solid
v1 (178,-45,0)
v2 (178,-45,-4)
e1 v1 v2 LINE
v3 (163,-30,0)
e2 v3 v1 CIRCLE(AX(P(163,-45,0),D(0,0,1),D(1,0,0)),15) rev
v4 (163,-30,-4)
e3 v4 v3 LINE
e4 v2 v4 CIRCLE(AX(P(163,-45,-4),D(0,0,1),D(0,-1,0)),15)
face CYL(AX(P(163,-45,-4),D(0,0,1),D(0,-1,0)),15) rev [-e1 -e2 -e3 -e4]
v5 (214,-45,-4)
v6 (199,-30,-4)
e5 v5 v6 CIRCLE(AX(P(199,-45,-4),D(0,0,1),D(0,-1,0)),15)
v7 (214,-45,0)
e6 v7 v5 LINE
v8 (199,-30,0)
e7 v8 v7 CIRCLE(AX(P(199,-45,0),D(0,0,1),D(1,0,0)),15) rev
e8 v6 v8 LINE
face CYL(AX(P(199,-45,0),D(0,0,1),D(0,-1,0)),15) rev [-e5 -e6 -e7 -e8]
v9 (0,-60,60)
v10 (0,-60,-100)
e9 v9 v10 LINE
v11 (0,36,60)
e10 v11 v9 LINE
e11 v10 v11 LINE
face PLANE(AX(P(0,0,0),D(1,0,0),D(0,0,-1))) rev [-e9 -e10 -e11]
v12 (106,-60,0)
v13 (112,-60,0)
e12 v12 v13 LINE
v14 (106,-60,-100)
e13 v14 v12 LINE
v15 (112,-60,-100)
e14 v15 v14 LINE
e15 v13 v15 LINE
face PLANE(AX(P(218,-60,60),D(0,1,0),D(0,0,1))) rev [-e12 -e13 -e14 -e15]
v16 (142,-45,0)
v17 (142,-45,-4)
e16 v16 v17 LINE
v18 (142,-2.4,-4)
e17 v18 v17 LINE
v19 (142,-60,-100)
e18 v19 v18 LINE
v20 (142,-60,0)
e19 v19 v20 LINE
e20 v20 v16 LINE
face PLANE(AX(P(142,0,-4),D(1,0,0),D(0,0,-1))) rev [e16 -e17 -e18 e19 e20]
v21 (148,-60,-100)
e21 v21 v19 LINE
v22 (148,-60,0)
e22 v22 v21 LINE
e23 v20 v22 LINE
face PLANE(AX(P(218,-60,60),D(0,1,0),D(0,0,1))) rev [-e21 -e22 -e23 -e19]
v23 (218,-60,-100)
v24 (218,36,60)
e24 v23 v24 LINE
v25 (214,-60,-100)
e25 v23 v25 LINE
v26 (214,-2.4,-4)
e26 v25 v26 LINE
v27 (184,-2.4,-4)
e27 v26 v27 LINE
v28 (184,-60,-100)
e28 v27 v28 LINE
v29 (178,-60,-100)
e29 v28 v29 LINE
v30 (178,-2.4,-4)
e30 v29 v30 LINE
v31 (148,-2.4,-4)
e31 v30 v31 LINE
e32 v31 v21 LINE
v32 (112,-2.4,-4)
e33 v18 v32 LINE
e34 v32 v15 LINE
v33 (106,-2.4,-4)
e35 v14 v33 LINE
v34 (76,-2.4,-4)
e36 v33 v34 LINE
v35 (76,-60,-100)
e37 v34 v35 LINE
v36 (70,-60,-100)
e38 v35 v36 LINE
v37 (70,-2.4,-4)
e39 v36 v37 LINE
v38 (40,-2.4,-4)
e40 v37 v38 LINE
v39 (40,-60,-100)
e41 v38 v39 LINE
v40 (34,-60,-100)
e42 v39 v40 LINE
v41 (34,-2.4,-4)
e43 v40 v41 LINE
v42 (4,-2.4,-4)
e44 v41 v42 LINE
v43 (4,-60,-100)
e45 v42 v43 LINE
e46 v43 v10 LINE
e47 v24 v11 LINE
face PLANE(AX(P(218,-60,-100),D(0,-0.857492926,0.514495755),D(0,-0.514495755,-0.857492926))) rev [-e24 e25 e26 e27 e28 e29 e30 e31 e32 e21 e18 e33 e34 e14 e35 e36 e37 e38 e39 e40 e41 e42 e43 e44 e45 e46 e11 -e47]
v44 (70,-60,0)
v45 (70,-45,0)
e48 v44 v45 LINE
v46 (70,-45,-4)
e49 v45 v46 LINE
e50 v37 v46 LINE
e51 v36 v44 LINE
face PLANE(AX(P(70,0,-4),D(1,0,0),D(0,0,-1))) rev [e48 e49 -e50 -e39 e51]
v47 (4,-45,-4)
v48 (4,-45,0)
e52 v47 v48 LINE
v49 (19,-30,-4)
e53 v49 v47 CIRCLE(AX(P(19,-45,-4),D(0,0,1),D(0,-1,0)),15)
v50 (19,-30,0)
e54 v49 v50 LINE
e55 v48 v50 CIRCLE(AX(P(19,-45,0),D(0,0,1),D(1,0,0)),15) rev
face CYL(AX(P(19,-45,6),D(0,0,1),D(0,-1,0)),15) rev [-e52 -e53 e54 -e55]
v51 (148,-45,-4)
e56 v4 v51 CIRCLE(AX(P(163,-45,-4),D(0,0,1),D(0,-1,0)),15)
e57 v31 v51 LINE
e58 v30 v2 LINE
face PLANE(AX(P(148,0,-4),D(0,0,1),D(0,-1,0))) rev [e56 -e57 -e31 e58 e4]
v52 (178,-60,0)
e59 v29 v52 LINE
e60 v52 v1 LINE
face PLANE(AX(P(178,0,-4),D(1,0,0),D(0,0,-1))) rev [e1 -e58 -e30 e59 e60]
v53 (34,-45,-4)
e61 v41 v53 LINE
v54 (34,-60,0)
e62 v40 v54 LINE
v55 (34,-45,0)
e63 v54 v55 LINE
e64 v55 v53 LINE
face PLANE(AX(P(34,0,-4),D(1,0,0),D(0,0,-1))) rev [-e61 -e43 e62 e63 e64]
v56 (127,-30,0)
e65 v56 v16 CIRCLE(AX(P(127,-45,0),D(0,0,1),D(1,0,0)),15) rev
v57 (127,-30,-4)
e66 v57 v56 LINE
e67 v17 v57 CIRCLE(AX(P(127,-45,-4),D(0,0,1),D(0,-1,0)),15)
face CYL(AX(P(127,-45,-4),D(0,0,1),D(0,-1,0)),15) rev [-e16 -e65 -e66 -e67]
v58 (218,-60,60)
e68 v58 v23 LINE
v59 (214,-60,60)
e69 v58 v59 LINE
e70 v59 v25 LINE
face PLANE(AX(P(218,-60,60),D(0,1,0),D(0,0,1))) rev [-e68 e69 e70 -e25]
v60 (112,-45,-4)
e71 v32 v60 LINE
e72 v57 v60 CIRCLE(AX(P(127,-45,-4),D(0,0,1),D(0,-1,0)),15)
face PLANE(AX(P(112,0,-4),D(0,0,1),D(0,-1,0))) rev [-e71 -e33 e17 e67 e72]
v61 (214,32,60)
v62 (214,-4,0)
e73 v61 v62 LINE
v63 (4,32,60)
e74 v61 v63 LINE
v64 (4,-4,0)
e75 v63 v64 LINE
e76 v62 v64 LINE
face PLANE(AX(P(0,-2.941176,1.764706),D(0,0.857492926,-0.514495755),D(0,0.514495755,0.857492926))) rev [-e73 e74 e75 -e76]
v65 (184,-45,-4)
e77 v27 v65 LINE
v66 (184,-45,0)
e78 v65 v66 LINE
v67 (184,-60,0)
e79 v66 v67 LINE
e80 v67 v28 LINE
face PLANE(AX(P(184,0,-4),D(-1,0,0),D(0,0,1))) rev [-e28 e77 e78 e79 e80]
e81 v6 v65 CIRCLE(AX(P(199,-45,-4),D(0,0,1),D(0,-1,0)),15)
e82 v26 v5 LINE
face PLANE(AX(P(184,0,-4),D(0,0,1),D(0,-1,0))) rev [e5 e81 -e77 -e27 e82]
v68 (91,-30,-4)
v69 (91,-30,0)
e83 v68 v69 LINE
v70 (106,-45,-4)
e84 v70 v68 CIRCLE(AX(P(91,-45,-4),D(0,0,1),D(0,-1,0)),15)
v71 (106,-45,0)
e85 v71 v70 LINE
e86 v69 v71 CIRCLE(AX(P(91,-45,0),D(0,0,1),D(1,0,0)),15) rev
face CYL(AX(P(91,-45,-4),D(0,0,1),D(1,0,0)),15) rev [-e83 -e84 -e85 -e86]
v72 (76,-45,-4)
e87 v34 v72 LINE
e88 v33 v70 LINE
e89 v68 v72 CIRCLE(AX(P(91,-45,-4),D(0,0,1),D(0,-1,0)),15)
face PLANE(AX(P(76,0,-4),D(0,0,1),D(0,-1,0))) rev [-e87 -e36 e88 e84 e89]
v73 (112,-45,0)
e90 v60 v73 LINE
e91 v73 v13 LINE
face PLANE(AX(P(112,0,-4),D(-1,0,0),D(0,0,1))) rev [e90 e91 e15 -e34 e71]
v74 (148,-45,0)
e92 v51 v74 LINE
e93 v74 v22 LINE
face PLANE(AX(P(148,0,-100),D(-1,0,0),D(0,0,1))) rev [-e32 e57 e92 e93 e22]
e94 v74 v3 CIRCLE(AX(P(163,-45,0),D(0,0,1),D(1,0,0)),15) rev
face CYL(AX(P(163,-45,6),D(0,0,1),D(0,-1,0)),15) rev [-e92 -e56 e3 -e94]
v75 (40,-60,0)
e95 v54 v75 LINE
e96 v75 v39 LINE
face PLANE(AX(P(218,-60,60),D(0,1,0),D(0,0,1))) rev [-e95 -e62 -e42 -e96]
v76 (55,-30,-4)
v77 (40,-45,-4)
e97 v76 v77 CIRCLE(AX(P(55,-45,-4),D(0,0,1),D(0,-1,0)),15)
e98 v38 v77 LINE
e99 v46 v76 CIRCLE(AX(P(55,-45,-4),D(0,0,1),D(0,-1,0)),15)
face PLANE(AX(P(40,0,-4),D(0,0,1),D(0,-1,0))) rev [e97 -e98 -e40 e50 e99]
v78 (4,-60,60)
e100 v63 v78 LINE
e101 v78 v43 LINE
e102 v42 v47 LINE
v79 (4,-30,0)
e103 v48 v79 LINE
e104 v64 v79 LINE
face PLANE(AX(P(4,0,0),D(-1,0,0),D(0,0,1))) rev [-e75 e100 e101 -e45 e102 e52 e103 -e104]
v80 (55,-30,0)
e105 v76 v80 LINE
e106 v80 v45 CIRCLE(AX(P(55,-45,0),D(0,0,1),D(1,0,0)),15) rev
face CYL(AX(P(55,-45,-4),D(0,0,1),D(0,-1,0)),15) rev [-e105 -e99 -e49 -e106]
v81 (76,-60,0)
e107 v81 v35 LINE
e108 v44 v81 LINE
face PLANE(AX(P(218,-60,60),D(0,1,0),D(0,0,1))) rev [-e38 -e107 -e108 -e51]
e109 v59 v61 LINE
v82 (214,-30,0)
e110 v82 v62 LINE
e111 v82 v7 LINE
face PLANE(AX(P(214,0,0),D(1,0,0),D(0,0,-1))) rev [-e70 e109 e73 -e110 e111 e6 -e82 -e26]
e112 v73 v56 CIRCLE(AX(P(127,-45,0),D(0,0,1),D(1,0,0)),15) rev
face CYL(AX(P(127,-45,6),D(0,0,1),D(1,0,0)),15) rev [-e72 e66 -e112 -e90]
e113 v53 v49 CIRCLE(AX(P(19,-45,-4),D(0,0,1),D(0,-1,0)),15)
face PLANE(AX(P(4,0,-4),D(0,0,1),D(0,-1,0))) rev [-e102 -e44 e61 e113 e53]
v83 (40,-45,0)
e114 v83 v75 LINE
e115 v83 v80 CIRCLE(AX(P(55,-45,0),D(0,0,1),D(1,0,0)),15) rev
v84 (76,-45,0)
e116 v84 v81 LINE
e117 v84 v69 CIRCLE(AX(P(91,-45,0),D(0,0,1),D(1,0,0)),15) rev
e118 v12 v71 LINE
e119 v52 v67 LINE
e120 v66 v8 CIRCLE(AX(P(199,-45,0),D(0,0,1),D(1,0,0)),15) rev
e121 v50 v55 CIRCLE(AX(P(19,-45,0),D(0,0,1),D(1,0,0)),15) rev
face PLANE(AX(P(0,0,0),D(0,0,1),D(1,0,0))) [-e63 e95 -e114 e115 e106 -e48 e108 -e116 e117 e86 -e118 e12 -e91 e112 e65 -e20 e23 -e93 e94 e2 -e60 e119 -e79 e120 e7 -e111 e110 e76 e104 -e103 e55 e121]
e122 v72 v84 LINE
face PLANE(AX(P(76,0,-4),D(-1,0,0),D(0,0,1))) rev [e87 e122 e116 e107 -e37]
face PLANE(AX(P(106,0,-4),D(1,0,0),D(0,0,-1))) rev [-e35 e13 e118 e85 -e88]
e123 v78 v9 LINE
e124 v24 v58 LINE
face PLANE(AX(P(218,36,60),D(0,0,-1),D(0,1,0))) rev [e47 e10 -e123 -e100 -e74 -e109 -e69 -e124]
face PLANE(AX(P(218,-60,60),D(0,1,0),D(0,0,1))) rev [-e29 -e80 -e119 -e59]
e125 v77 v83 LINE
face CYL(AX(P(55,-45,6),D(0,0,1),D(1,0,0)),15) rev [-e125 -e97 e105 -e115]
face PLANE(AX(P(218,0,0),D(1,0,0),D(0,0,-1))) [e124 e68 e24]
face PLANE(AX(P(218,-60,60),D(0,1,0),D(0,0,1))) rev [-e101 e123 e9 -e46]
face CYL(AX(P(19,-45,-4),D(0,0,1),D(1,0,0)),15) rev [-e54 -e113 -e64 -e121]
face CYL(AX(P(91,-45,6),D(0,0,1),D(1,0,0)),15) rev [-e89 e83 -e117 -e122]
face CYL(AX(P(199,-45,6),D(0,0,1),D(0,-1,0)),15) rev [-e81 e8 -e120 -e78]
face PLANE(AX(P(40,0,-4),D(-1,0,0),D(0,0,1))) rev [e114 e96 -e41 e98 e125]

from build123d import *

# Parameters (mm, degrees)
SALIENTE_EXTRUIR1_DEPTH = 218
CROQUIS4_W              = 30.00000000000003
CROQUIS4_H              = 96.00000000000001
CROQUIS4_W_2            = 30
CORTAR_EXTRUIR1_DEPTH   = 60
CORTAR_EXTRUIR2_DEPTH   = 10
REDONDEO1_R             = 15


with BuildPart() as part:
    # Croquis2 → Saliente-Extruir1 (new body)
    with BuildSketch(Plane(origin=(0, 0, 0), x_dir=(0, 0, -1), z_dir=(1, 0, 0))):
        Polygon((-60.000000000000014, 35.99999999999998), (-59.99999999999997, -60), (100, -59.99999999999999), align=None)
    extrude(amount=SALIENTE_EXTRUIR1_DEPTH)

    # Croquis3 → Cortar-Recubrir1 section 0
    with BuildSketch(Plane.XY.offset(60)):
        with BuildLine():
            Line((4, 32), (214, 32))
            Line((214, 32), (214, -59.99999999999997))
            Line((214, -59.99999999999997), (4.0000000000000115, -59.99999999999997))
            Line((4.0000000000000115, -59.99999999999997), (4, 32))
        make_face()
    # Croquis3D3 → Cortar-Recubrir1 section 1
    with BuildSketch(Plane(origin=(4, -3.9999999999999964, 0), x_dir=(0.9662349396012463, -0.25766265056033233, 0), z_dir=(0, 0, 1))):
        with BuildLine():
            Line((0, 0), (202.9093373162617, 54.10915661766981))
            Line((202.9093373162617, 54.10915661766981), (217.33844574764032, 0))
            Line((217.33844574764032, 0), (14.42910843137861, -54.1091566176698))
            Line((14.42910843137861, -54.1091566176698), (0, 0))
        make_face()
    loft(mode=Mode.SUBTRACT)

    # Croquis4 → Cortar-Extruir1 (cut)
    with BuildSketch(Plane.XZ.offset(60)):
        Polygon((3.9999999999999982, -4), (33.99999999999999, -4), (34, -100), (4.000000000000011, -100), align=None)
        Polygon((40, -4), (70, -4), (70, -100), (40.000000000000014, -100), align=None)
        Polygon((76.00000000000001, -3.9999999999999973), (106.00000000000001, -3.9999999999999973), (106.00000000000003, -100), (76.00000000000003, -100), align=None)
        Polygon((112.00000000000001, -4), (142.00000000000003, -4), (142.00000000000003, -100), (112.00000000000003, -100), align=None)
        with Locations((199, -52.00000000000001)):
            Rectangle(CROQUIS4_W, CROQUIS4_H)
        with Locations((163.00000000000003, -52.00000000000001)):
            Rectangle(CROQUIS4_W_2, CROQUIS4_H)
    extrude(amount=-CORTAR_EXTRUIR1_DEPTH, mode=Mode.SUBTRACT)

    # Croquis5 → Cortar-Extruir2 (cut)
    with BuildSketch(Plane(origin=(0, 1.7e-16, -3.9999999999999973), x_dir=(-1, 0, 0), z_dir=(0, 4e-17, -1))):
        Polygon((-199, -60), (-184, -60), (-184, -29.999999999999993), (-214.00000000000006, -30), (-214.00000000000003, -60), align=None)
        Polygon((-163.00000000000003, -60), (-148.00000000000003, -60), (-148.00000000000006, -30.000000000000004), (-178.00000000000006, -30.00000000000001), (-178.00000000000006, -60), align=None)
        Polygon((-127, -60), (-112, -60), (-112, -30), (-142.00000000000003, -30.000000000000004), (-142.00000000000003, -60), align=None)
        Polygon((-91.00000000000001, -60), (-76.00000000000001, -59.99999999999999), (-76.00000000000001, -29.999999999999993), (-106.00000000000003, -29.999999999999993), (-106.00000000000001, -60), align=None)
        Polygon((-55.00000000000001, -60), (-40.00000000000001, -60), (-40.00000000000001, -30), (-70.00000000000001, -30.000000000000007), (-70, -60), align=None)
        Polygon((-18.999999999999996, -60), (-3.9999999999999964, -60), (-3.9999999999999964, -30), (-33.99999999999999, -30), (-33.99999999999999, -60), align=None)
    extrude(amount=-CORTAR_EXTRUIR2_DEPTH, mode=Mode.SUBTRACT)

    # Redondeo1
    redondeo1_edges = [part.edges().sort_by_distance(p)[0] for p in [
        (3.9999999999999964, -30, -1.9999999999999993),
        (33.99999999999999, -30, -1.9999999999999991),
        (40.00000000000001, -30, -1.9999999999999993),
        (70.00000000000001, -30.000000000000007, -1.9999999999999993),
        (76.00000000000001, -29.999999999999993, -1.9999999999999991),
        (106.00000000000003, -29.999999999999993, -1.9999999999999993),
        (112, -30, -1.9999999999999993),
        (142.00000000000003, -30.000000000000004, -1.9999999999999993),
        (148.00000000000006, -30.000000000000004, -1.9999999999999993),
        (178.00000000000006, -30.00000000000001, -1.9999999999999993),
        (184, -29.999999999999993, -1.9999999999999993),
        (214.00000000000006, -30, -1.9999999999999993),
    ]]
    fillet(redondeo1_edges, radius=REDONDEO1_R - 0.0001)  # a hair under: the kernel refuses the full size


solid = part.part
